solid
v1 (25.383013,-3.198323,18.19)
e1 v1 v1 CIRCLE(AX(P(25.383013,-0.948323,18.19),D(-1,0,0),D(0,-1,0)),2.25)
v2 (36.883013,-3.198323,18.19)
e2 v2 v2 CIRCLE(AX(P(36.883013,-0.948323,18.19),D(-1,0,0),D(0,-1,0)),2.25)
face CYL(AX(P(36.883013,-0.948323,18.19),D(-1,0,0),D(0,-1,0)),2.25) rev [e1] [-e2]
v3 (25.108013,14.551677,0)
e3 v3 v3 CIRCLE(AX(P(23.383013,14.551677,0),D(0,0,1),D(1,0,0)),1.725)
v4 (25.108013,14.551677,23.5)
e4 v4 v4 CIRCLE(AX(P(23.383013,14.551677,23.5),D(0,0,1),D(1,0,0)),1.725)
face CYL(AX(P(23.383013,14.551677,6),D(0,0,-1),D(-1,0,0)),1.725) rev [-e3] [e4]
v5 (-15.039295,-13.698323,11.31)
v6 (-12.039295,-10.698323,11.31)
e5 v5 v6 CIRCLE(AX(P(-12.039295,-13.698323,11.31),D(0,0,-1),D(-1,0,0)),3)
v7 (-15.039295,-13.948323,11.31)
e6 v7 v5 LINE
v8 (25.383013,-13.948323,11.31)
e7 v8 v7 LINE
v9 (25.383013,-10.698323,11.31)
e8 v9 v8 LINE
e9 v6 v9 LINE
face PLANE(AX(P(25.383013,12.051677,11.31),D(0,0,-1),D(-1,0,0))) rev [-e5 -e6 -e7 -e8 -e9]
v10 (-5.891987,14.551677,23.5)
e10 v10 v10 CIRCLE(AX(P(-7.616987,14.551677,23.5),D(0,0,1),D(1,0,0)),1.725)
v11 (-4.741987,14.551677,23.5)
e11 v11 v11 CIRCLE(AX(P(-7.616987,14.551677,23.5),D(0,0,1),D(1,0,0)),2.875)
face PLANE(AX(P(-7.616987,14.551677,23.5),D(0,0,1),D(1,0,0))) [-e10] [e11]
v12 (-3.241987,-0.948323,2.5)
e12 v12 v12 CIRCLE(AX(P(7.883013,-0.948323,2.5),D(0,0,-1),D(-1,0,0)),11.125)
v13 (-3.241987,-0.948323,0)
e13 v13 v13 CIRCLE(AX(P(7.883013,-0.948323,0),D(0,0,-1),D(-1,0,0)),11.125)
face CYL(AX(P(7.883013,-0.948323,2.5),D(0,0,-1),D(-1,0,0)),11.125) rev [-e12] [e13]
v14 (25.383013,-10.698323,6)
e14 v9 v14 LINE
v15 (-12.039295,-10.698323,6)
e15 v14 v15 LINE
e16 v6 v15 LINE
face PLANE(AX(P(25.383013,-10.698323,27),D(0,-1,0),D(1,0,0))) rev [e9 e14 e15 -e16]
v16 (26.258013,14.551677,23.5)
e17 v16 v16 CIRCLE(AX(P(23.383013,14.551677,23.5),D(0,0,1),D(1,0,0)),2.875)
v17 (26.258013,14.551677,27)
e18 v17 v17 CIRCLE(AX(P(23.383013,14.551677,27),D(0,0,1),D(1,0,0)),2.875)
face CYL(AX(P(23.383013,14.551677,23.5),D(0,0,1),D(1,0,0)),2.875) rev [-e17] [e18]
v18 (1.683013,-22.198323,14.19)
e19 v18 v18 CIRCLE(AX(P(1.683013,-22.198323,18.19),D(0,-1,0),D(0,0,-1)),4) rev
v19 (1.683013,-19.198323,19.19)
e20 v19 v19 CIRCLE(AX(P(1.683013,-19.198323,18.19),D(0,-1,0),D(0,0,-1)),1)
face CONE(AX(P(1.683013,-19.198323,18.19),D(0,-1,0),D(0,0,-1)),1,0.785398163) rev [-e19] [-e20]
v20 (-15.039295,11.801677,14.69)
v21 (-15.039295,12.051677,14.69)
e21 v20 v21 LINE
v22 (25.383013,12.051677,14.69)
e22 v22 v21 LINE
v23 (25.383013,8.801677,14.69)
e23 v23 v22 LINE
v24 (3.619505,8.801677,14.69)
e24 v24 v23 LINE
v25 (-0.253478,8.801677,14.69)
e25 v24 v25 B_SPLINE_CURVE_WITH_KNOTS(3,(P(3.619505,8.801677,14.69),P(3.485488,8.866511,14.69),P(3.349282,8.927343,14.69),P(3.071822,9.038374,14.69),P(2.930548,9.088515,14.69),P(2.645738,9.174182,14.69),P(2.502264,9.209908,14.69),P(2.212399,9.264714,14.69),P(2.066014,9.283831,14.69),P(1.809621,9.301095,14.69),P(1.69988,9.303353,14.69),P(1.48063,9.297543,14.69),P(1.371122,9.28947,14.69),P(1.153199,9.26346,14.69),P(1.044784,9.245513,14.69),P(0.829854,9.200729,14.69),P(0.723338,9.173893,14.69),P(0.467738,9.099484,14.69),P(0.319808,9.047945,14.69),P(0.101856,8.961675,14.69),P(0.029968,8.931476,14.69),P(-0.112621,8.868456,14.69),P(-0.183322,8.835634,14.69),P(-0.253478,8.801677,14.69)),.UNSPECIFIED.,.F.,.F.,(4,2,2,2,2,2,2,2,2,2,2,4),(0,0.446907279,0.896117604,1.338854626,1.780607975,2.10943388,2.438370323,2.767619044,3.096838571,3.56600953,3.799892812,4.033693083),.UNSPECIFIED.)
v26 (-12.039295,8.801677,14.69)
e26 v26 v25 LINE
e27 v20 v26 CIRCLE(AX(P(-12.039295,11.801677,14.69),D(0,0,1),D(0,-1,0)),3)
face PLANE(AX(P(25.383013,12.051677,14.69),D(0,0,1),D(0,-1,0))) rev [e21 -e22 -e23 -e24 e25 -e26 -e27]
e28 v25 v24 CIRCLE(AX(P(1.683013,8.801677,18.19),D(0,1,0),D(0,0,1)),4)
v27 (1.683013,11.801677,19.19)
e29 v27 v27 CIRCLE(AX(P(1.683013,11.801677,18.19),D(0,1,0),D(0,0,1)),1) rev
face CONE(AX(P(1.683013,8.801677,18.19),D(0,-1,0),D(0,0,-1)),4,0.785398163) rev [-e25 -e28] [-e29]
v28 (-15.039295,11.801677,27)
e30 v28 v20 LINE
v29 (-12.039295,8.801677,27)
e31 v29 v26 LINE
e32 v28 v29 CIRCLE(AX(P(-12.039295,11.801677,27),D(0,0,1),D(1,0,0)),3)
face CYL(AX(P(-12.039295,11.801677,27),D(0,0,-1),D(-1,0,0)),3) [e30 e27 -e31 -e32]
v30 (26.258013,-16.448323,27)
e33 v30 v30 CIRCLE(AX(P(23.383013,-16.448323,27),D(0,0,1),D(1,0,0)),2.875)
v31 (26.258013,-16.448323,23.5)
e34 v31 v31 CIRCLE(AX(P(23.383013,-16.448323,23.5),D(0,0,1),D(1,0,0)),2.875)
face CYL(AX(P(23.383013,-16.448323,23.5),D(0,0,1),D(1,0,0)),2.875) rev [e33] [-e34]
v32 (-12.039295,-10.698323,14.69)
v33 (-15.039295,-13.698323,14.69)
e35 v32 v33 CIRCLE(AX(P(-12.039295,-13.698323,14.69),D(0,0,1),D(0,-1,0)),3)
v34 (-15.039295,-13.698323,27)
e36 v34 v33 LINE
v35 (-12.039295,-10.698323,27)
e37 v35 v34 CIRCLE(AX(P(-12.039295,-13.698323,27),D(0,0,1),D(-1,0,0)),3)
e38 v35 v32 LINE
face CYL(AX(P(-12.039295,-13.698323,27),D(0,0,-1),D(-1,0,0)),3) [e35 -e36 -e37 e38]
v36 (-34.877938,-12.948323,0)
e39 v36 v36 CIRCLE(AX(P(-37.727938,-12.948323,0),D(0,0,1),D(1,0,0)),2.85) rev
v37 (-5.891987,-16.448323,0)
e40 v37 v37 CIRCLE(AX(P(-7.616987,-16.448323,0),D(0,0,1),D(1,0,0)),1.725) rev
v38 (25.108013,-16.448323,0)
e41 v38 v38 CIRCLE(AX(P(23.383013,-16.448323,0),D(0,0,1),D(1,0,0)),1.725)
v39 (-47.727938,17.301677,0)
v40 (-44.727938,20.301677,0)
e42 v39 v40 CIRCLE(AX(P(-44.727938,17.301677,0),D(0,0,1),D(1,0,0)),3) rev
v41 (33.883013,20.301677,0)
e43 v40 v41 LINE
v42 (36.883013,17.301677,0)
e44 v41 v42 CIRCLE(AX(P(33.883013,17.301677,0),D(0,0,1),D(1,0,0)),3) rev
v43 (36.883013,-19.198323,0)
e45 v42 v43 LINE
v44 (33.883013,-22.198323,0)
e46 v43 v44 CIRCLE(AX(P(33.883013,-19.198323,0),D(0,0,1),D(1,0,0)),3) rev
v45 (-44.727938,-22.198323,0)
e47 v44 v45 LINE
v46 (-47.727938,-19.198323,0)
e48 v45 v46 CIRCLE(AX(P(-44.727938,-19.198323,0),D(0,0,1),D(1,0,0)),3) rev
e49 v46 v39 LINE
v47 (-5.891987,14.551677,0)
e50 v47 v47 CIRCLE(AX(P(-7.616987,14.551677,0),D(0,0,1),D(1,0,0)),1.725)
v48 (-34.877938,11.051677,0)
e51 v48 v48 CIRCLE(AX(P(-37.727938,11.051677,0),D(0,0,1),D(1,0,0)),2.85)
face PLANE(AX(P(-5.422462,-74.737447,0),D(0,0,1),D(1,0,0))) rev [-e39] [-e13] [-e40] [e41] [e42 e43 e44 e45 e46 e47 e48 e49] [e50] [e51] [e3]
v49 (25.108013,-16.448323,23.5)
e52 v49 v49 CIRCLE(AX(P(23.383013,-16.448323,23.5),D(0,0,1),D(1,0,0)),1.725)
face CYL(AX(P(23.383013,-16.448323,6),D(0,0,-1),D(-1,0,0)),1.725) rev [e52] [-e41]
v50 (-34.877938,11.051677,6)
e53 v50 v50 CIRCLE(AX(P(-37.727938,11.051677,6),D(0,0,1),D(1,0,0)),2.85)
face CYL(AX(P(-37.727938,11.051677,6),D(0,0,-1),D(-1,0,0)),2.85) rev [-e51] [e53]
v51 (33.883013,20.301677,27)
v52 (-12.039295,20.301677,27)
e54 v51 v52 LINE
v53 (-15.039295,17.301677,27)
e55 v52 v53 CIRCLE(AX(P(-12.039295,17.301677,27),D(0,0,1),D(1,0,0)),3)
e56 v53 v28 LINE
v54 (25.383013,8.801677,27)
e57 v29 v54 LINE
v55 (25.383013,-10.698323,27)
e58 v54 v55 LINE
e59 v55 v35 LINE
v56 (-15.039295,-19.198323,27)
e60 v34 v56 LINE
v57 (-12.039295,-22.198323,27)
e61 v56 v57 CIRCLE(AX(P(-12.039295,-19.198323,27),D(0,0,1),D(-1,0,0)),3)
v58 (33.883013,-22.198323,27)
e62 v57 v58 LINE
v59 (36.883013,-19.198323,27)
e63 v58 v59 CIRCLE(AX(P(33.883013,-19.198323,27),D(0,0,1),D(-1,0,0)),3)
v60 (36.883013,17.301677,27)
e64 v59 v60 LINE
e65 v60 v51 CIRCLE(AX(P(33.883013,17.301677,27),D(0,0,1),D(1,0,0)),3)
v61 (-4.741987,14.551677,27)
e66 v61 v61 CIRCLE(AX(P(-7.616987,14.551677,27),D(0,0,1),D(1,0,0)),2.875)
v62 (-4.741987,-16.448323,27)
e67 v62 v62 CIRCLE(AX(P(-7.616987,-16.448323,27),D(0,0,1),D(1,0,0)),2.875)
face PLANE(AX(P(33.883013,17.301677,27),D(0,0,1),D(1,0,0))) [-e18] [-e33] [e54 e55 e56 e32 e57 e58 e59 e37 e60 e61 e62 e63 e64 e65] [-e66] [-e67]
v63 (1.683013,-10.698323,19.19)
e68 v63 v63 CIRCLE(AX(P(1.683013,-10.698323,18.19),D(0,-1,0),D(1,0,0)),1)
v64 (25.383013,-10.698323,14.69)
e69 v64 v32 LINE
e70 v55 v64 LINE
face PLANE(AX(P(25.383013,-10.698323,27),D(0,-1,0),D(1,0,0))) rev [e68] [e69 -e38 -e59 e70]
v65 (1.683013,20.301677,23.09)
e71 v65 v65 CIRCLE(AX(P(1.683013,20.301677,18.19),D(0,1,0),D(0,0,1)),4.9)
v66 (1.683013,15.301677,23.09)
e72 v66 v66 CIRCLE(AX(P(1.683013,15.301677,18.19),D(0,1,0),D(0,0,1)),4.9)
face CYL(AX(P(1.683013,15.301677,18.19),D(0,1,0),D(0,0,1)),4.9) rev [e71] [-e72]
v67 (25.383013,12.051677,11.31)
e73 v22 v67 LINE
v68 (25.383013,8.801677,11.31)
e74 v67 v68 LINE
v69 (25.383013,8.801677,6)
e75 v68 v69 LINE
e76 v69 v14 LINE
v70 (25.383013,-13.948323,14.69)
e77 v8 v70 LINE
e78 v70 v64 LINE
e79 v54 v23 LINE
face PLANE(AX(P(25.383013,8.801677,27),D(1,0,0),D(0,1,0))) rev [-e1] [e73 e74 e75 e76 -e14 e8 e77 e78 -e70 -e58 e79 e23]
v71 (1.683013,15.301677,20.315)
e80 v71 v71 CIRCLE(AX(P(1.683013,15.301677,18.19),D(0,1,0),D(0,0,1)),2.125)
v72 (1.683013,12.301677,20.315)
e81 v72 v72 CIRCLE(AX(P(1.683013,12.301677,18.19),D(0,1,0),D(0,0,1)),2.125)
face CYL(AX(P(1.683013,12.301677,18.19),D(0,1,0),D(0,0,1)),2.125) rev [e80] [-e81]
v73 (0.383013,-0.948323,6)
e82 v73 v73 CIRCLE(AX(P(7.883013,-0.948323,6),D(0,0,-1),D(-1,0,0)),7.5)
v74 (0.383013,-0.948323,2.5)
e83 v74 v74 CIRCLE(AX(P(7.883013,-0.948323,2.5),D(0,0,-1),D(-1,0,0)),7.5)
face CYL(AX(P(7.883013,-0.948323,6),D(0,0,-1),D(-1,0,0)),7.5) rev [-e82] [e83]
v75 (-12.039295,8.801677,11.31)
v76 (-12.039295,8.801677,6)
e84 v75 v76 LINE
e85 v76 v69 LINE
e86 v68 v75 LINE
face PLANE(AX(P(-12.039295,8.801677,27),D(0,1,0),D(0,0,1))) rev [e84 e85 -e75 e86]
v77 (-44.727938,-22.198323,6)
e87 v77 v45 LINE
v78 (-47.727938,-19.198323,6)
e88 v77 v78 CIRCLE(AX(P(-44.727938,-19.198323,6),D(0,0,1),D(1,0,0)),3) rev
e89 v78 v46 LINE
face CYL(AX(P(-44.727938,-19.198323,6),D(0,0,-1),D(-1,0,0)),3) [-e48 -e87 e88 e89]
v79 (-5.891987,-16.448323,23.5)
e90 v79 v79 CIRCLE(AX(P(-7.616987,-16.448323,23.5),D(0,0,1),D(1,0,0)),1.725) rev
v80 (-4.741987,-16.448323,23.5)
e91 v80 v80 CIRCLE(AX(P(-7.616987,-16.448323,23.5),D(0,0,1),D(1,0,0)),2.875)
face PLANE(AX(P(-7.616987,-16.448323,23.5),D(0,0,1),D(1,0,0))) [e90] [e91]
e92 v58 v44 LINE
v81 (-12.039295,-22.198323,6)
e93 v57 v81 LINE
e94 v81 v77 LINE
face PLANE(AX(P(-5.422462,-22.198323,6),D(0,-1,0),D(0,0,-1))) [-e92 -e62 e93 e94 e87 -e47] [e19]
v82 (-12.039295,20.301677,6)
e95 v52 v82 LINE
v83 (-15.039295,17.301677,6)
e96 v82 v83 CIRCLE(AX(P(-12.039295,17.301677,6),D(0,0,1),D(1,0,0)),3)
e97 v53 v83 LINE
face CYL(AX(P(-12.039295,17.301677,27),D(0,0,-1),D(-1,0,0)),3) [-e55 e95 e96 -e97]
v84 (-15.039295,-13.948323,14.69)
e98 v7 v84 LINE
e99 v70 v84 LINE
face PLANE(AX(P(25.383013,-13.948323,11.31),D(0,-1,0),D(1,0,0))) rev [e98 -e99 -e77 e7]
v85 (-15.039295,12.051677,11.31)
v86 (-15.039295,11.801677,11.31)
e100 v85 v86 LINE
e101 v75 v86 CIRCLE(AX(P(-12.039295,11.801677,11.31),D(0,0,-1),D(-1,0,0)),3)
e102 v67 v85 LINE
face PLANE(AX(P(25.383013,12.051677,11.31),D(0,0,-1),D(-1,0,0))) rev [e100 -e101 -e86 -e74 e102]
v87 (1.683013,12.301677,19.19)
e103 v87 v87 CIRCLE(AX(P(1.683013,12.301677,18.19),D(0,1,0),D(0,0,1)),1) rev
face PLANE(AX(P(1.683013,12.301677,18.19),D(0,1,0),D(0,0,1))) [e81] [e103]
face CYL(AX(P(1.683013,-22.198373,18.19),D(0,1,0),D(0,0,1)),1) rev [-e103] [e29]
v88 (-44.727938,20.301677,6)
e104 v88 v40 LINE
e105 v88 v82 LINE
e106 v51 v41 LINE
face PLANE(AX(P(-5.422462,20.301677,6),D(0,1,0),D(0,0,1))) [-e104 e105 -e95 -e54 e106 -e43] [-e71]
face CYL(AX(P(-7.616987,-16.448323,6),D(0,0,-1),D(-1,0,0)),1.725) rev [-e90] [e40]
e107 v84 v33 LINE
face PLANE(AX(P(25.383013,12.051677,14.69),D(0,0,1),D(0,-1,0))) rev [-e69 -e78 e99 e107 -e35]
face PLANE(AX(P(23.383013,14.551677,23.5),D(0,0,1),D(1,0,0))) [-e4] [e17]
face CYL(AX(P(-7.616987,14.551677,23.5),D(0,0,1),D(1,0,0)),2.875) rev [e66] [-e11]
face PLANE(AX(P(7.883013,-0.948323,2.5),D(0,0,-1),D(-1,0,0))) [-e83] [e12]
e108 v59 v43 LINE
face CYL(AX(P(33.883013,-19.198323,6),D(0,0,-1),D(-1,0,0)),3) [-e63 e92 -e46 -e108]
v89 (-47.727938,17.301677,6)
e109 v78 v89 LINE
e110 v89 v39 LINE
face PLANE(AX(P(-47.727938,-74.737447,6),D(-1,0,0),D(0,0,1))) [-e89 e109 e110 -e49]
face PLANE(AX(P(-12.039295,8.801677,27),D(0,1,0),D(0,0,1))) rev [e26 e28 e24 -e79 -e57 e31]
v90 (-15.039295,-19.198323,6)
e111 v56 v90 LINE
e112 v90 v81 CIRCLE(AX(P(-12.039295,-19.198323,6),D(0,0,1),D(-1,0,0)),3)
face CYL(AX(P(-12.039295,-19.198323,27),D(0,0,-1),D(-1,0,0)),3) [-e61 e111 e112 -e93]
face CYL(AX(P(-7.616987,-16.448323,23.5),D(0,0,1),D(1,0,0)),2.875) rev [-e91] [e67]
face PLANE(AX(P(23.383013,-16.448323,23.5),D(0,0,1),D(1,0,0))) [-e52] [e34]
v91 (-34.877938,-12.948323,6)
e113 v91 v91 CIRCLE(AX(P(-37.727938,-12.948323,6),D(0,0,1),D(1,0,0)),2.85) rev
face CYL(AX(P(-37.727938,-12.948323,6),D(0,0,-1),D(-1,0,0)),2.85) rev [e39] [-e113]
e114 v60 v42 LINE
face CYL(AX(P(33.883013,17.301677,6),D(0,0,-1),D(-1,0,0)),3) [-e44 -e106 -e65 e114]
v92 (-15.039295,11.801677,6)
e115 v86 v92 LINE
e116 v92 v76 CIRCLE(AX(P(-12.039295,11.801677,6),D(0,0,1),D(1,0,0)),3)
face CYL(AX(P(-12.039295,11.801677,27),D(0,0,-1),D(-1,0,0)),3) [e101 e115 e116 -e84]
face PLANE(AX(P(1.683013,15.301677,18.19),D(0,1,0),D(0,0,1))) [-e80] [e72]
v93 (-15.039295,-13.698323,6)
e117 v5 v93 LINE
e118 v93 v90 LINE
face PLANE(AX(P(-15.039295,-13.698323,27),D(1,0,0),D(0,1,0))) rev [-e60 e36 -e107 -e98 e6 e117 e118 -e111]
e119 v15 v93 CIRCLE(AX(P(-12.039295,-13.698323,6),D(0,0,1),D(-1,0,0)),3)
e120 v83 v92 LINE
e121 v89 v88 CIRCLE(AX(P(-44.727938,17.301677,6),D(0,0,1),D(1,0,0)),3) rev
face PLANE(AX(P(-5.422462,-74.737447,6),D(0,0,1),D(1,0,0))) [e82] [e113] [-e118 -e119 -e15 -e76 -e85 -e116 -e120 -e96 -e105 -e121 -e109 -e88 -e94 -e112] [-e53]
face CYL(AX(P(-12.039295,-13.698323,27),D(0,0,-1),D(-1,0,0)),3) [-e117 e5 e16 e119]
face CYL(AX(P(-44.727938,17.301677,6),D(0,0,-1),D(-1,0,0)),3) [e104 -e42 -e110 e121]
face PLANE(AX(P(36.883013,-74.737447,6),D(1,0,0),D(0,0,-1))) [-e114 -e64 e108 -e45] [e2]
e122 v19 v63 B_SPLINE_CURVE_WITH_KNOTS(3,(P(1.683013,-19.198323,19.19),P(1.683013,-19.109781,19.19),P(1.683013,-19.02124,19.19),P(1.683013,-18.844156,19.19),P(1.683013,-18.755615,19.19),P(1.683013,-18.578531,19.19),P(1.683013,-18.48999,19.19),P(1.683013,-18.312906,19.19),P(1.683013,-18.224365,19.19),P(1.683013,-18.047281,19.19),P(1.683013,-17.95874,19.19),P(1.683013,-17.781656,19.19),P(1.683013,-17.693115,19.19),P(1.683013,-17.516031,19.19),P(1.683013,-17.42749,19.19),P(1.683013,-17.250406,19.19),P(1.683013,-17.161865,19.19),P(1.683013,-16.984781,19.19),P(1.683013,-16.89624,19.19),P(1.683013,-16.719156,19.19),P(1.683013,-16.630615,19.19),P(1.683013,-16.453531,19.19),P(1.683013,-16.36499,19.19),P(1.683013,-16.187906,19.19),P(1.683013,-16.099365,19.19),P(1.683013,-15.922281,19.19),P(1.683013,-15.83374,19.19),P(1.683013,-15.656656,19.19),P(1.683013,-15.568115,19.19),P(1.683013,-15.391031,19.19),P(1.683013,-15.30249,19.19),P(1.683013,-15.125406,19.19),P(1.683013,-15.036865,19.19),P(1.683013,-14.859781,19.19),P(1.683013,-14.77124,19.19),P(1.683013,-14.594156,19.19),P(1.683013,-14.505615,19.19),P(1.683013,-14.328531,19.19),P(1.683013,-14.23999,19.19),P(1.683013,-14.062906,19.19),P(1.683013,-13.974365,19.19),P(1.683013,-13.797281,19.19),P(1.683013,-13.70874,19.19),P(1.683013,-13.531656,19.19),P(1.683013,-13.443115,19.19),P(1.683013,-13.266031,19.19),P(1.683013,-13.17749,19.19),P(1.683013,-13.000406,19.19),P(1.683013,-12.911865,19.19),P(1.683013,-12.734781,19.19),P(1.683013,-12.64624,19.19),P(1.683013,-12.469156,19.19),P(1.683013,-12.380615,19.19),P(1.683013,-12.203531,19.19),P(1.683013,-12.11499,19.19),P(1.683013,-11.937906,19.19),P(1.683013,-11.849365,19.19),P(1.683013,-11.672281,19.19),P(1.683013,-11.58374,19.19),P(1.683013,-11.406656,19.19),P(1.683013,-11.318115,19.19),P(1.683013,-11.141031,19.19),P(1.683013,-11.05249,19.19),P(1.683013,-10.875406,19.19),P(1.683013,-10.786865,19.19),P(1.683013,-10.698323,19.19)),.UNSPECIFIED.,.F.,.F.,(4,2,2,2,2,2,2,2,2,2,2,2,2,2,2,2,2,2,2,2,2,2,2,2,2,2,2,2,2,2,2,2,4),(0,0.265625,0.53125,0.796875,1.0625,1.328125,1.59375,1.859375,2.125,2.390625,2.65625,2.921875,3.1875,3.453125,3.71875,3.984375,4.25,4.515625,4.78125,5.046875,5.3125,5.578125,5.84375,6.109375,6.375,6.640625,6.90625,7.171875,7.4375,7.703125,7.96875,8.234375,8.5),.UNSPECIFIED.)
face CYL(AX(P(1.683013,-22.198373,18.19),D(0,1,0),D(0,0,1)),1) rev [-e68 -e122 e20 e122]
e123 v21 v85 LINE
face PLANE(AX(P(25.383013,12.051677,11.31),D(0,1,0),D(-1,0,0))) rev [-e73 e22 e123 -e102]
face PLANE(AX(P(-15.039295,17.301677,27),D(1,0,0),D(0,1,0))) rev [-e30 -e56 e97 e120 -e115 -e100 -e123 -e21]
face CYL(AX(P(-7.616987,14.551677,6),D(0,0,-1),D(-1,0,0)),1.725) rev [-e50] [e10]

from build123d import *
from build123d.topology import SkipClean

# Parameters (mm, degrees)
SKETCH1_R           = 2.850000007
SKETCH1_R_2         = 1.725
BOSS_EXTRUDE1_DEPTH = 6
SKETCH7_R           = 11.125
CUT_EXTRUDE4_DEPTH  = 2.5
SKETCH8_R           = 7.5
CUT_EXTRUDE5_DEPTH  = 6
SKETCH10_R          = 1.725
BOSS_EXTRUDE4_DEPTH = 21
SKETCH11_W          = 3.38
SKETCH11_H          = 26
CUT_EXTRUDE6_DEPTH  = 40.422308
SKETCH14_R          = 1
CUT_EXTRUDE7_DEPTH  = 70.377273429
CHAMFER1_SIZE       = 3
SKETCH19_R          = 4.9
SKETCH19_R_2        = 1
CUT_EXTRUDE9_DEPTH  = 5
SKETCH20_R          = 2.125
CUT_EXTRUDE10_DEPTH = 3
SKETCH21_R          = 2.875
CUT_EXTRUDE11_DEPTH = 3.5
SKETCH22_R          = 2.25
CUT_EXTRUDE12_DEPTH = 82.036885127
CHAMFER5_SIZE       = 3


with BuildPart() as part:
    # Sketch1 → Boss-Extrude1 (new body)
    with BuildSketch(Plane.XY):
        with BuildLine():
            Line((-44.727938028, 20.301676915), (33.883013294, 20.301676915))
            ThreePointArc((33.883013294, 20.301676915), (36.004333638, 19.422997259), (36.883013294, 17.301676915))
            Line((36.883013294, 17.301676915), (36.883013294, -19.198323085))
            ThreePointArc((36.883013294, -19.198323085), (36.004333638, -21.319643428), (33.883013294, -22.198323085))
            Line((33.883013294, -22.198323085), (-44.727938028, -22.198323085))
            ThreePointArc((-44.727938028, -22.198323085), (-46.849258372, -21.319643428), (-47.727938028, -19.198323085))
            Line((-47.727938028, -19.198323085), (-47.727938028, 17.301676915))
            ThreePointArc((-47.727938028, 17.301676915), (-46.849258372, 19.422997259), (-44.727938028, 20.301676915))
        make_face()
        with Locations((-37.727938028, 11.051676915)):
            Circle(SKETCH1_R, mode=Mode.SUBTRACT)
        with Locations((-37.727938028, -12.948323085)):
            Circle(SKETCH1_R, mode=Mode.SUBTRACT)
        with Locations((-7.616986706, 14.551676915)):
            Circle(SKETCH1_R_2, mode=Mode.SUBTRACT)
        with Locations((-7.616986706, -16.448323085)):
            Circle(SKETCH1_R_2, mode=Mode.SUBTRACT)
        with Locations((23.383013294, -16.448323085)):
            Circle(SKETCH1_R_2, mode=Mode.SUBTRACT)
        with Locations((23.383013294, 14.551676915)):
            Circle(SKETCH1_R_2, mode=Mode.SUBTRACT)
    extrude(amount=BOSS_EXTRUDE1_DEPTH)

    # Sketch7 → Cut-Extrude4 (cut)
    with BuildSketch(Plane(origin=(0, 0, 0), x_dir=(-1, 0, 0), z_dir=(0, 0, -1))):
        with Locations((-7.883013294, -0.948323085)):
            Circle(SKETCH7_R)
    extrude(amount=-CUT_EXTRUDE4_DEPTH, mode=Mode.SUBTRACT)

    # Sketch8 → Cut-Extrude5 (cut)
    with BuildSketch(Plane(origin=(0, 0, 0), x_dir=(-1, 0, 0), z_dir=(0, 0, -1))):
        with Locations((-7.883013294, -0.948323085)):
            Circle(SKETCH8_R)
    extrude(amount=-CUT_EXTRUDE5_DEPTH, mode=Mode.SUBTRACT)

    # Sketch10 → Boss-Extrude4 (add)
    with BuildSketch(Plane.XY.offset(6)):
        with BuildLine():
            Line((-12.039294537, 20.301676915), (33.883013294, 20.301676915))
            ThreePointArc((33.883013294, 20.301676915), (36.004333638, 19.422997259), (36.883013294, 17.301676915))
            Line((36.883013294, 17.301676915), (36.883013294, -19.198323085))
            ThreePointArc((36.883013294, -19.198323085), (36.004333638, -21.319643428), (33.883013294, -22.198323085))
            Line((33.883013294, -22.198323085), (-12.039294537, -22.198323085))
            ThreePointArc((-12.039294537, -22.198323085), (-14.160614881, -21.319643428), (-15.039294537, -19.198323085))
            Line((-15.039294537, -19.198323085), (-15.039294537, -13.698323085))
            ThreePointArc((-15.039294537, -13.698323085), (-14.160614881, -11.577002741), (-12.039294537, -10.698323085))
            Line((-12.039294537, -10.698323085), (25.383013294, -10.698323085))
            Line((25.383013294, -10.698323085), (25.383013294, 8.801676915))
            Line((25.383013294, 8.801676915), (-12.039294537, 8.801676915))
            ThreePointArc((-12.039294537, 8.801676915), (-14.160614881, 9.680356572), (-15.039294537, 11.801676915))
            Line((-15.039294537, 11.801676915), (-15.039294537, 17.301676915))
            ThreePointArc((-15.039294537, 17.301676915), (-14.160614881, 19.422997259), (-12.039294537, 20.301676915))
        make_face()
        with Locations((-7.616986706, 14.551676915)):
            Circle(SKETCH10_R, mode=Mode.SUBTRACT)
        with Locations((23.383013294, 14.551676915)):
            Circle(SKETCH10_R, mode=Mode.SUBTRACT)
        with Locations((-7.616986706, -16.448323085)):
            Circle(SKETCH10_R, mode=Mode.SUBTRACT)
        with Locations((23.383013294, -16.448323085)):
            Circle(SKETCH10_R, mode=Mode.SUBTRACT)
    extrude(amount=BOSS_EXTRUDE4_DEPTH)

    # Sketch11 → Cut-Extrude6 (cut)
    with SkipClean():  # the faces are left unmerged after this step: merging them gives an invalid solid
        with BuildSketch(Plane.ZY.offset(15.039294537)):
            with Locations((13, -0.948323085)):
                Rectangle(SKETCH11_W, SKETCH11_H)
        extrude(amount=-CUT_EXTRUDE6_DEPTH, mode=Mode.SUBTRACT)

    # Sketch14 → Cut-Extrude7 (cut, through all)
    with SkipClean():  # the faces are left unmerged after this step: merging them gives an invalid solid
        with BuildSketch(Plane(origin=(0, 20.301676915, 0), x_dir=(1, 0, 0), z_dir=(0, 1, 0))):
            with Locations(Location((1.683013294, -18.19, 0), (0, 0, 270))):
                Circle(SKETCH14_R)
        extrude(amount=-CUT_EXTRUDE7_DEPTH, mode=Mode.SUBTRACT)

    # Chamfer1
    chamfer1_edges = [part.edges().sort_by_distance(p)[0] for p in [
        (1.683013294, -22.198323085, 17.19),
    ]]
    chamfer(chamfer1_edges, length=CHAMFER1_SIZE)

    # Sketch19 → Cut-Extrude9 (cut)
    with SkipClean():  # the faces are left unmerged after this step: merging them gives an invalid solid
        with BuildSketch(Plane(origin=(0, 20.301676915, 0), x_dir=(1, 0, 0), z_dir=(0, 1, 0))):
            with Locations(Location((1.683013294, -18.19, 0), (0, 0, 270))):
                Circle(SKETCH19_R)
            with Locations(Location((1.683013294, -18.19, 0), (0, 0, 270))):
                Circle(SKETCH19_R_2, mode=Mode.SUBTRACT)
        extrude(amount=-CUT_EXTRUDE9_DEPTH, mode=Mode.SUBTRACT)

    # Sketch20 → Cut-Extrude10 (cut)
    with SkipClean():  # the faces are left unmerged after this step: merging them gives an invalid solid
        with BuildSketch(Plane(origin=(0, 15.301676915, 0), x_dir=(1, 0, 0), z_dir=(0, 1, 0))):
            with Locations(Location((1.683013294, -18.19, 0), (0, 0, 270))):
                Circle(SKETCH20_R)
        extrude(amount=-CUT_EXTRUDE10_DEPTH, mode=Mode.SUBTRACT)

    # Sketch21 → Cut-Extrude11 (cut)
    with SkipClean():  # the faces are left unmerged after this step: merging them gives an invalid solid
        with BuildSketch(Plane.XY.offset(27)):
            with Locations((23.383013294, 14.551676915)):
                Circle(SKETCH21_R)
            with Locations((23.383013294, -16.448323085)):
                Circle(SKETCH21_R)
            with Locations((-7.616986706, -16.448323085)):
                Circle(SKETCH21_R)
            with Locations((-7.616986706, 14.551676915)):
                Circle(SKETCH21_R)
        extrude(amount=-CUT_EXTRUDE11_DEPTH, mode=Mode.SUBTRACT)

    # Sketch22 → Cut-Extrude12 (cut, through all)
    with SkipClean():  # the faces are left unmerged after this step: merging them gives an invalid solid
        with BuildSketch(Plane.ZY.offset(-25.383013294)):
            with Locations(Location((18.19, -0.948323085, 0), (0, 0, 270))):
                Circle(SKETCH22_R)
        extrude(amount=-CUT_EXTRUDE12_DEPTH, mode=Mode.SUBTRACT)

    # Chamfer5
    # the kernel refuses this chamfer: 3 mm, written as the material it takes off along each edge
    with BuildSketch(Plane(origin=(1.683013294, 8.801676915, 18.19), x_dir=(0, 0, 1), z_dir=(-1, 0, 0))) as chamfer5_piece_1:
        Polygon((1 + CHAMFER5_SIZE, 0), (1, CHAMFER5_SIZE), (1, 0), align=None)
    revolve(axis=Axis((1.683013294, 8.801676915, 18.19), (0, 1, 0)), mode=Mode.SUBTRACT)


solid = part.part
